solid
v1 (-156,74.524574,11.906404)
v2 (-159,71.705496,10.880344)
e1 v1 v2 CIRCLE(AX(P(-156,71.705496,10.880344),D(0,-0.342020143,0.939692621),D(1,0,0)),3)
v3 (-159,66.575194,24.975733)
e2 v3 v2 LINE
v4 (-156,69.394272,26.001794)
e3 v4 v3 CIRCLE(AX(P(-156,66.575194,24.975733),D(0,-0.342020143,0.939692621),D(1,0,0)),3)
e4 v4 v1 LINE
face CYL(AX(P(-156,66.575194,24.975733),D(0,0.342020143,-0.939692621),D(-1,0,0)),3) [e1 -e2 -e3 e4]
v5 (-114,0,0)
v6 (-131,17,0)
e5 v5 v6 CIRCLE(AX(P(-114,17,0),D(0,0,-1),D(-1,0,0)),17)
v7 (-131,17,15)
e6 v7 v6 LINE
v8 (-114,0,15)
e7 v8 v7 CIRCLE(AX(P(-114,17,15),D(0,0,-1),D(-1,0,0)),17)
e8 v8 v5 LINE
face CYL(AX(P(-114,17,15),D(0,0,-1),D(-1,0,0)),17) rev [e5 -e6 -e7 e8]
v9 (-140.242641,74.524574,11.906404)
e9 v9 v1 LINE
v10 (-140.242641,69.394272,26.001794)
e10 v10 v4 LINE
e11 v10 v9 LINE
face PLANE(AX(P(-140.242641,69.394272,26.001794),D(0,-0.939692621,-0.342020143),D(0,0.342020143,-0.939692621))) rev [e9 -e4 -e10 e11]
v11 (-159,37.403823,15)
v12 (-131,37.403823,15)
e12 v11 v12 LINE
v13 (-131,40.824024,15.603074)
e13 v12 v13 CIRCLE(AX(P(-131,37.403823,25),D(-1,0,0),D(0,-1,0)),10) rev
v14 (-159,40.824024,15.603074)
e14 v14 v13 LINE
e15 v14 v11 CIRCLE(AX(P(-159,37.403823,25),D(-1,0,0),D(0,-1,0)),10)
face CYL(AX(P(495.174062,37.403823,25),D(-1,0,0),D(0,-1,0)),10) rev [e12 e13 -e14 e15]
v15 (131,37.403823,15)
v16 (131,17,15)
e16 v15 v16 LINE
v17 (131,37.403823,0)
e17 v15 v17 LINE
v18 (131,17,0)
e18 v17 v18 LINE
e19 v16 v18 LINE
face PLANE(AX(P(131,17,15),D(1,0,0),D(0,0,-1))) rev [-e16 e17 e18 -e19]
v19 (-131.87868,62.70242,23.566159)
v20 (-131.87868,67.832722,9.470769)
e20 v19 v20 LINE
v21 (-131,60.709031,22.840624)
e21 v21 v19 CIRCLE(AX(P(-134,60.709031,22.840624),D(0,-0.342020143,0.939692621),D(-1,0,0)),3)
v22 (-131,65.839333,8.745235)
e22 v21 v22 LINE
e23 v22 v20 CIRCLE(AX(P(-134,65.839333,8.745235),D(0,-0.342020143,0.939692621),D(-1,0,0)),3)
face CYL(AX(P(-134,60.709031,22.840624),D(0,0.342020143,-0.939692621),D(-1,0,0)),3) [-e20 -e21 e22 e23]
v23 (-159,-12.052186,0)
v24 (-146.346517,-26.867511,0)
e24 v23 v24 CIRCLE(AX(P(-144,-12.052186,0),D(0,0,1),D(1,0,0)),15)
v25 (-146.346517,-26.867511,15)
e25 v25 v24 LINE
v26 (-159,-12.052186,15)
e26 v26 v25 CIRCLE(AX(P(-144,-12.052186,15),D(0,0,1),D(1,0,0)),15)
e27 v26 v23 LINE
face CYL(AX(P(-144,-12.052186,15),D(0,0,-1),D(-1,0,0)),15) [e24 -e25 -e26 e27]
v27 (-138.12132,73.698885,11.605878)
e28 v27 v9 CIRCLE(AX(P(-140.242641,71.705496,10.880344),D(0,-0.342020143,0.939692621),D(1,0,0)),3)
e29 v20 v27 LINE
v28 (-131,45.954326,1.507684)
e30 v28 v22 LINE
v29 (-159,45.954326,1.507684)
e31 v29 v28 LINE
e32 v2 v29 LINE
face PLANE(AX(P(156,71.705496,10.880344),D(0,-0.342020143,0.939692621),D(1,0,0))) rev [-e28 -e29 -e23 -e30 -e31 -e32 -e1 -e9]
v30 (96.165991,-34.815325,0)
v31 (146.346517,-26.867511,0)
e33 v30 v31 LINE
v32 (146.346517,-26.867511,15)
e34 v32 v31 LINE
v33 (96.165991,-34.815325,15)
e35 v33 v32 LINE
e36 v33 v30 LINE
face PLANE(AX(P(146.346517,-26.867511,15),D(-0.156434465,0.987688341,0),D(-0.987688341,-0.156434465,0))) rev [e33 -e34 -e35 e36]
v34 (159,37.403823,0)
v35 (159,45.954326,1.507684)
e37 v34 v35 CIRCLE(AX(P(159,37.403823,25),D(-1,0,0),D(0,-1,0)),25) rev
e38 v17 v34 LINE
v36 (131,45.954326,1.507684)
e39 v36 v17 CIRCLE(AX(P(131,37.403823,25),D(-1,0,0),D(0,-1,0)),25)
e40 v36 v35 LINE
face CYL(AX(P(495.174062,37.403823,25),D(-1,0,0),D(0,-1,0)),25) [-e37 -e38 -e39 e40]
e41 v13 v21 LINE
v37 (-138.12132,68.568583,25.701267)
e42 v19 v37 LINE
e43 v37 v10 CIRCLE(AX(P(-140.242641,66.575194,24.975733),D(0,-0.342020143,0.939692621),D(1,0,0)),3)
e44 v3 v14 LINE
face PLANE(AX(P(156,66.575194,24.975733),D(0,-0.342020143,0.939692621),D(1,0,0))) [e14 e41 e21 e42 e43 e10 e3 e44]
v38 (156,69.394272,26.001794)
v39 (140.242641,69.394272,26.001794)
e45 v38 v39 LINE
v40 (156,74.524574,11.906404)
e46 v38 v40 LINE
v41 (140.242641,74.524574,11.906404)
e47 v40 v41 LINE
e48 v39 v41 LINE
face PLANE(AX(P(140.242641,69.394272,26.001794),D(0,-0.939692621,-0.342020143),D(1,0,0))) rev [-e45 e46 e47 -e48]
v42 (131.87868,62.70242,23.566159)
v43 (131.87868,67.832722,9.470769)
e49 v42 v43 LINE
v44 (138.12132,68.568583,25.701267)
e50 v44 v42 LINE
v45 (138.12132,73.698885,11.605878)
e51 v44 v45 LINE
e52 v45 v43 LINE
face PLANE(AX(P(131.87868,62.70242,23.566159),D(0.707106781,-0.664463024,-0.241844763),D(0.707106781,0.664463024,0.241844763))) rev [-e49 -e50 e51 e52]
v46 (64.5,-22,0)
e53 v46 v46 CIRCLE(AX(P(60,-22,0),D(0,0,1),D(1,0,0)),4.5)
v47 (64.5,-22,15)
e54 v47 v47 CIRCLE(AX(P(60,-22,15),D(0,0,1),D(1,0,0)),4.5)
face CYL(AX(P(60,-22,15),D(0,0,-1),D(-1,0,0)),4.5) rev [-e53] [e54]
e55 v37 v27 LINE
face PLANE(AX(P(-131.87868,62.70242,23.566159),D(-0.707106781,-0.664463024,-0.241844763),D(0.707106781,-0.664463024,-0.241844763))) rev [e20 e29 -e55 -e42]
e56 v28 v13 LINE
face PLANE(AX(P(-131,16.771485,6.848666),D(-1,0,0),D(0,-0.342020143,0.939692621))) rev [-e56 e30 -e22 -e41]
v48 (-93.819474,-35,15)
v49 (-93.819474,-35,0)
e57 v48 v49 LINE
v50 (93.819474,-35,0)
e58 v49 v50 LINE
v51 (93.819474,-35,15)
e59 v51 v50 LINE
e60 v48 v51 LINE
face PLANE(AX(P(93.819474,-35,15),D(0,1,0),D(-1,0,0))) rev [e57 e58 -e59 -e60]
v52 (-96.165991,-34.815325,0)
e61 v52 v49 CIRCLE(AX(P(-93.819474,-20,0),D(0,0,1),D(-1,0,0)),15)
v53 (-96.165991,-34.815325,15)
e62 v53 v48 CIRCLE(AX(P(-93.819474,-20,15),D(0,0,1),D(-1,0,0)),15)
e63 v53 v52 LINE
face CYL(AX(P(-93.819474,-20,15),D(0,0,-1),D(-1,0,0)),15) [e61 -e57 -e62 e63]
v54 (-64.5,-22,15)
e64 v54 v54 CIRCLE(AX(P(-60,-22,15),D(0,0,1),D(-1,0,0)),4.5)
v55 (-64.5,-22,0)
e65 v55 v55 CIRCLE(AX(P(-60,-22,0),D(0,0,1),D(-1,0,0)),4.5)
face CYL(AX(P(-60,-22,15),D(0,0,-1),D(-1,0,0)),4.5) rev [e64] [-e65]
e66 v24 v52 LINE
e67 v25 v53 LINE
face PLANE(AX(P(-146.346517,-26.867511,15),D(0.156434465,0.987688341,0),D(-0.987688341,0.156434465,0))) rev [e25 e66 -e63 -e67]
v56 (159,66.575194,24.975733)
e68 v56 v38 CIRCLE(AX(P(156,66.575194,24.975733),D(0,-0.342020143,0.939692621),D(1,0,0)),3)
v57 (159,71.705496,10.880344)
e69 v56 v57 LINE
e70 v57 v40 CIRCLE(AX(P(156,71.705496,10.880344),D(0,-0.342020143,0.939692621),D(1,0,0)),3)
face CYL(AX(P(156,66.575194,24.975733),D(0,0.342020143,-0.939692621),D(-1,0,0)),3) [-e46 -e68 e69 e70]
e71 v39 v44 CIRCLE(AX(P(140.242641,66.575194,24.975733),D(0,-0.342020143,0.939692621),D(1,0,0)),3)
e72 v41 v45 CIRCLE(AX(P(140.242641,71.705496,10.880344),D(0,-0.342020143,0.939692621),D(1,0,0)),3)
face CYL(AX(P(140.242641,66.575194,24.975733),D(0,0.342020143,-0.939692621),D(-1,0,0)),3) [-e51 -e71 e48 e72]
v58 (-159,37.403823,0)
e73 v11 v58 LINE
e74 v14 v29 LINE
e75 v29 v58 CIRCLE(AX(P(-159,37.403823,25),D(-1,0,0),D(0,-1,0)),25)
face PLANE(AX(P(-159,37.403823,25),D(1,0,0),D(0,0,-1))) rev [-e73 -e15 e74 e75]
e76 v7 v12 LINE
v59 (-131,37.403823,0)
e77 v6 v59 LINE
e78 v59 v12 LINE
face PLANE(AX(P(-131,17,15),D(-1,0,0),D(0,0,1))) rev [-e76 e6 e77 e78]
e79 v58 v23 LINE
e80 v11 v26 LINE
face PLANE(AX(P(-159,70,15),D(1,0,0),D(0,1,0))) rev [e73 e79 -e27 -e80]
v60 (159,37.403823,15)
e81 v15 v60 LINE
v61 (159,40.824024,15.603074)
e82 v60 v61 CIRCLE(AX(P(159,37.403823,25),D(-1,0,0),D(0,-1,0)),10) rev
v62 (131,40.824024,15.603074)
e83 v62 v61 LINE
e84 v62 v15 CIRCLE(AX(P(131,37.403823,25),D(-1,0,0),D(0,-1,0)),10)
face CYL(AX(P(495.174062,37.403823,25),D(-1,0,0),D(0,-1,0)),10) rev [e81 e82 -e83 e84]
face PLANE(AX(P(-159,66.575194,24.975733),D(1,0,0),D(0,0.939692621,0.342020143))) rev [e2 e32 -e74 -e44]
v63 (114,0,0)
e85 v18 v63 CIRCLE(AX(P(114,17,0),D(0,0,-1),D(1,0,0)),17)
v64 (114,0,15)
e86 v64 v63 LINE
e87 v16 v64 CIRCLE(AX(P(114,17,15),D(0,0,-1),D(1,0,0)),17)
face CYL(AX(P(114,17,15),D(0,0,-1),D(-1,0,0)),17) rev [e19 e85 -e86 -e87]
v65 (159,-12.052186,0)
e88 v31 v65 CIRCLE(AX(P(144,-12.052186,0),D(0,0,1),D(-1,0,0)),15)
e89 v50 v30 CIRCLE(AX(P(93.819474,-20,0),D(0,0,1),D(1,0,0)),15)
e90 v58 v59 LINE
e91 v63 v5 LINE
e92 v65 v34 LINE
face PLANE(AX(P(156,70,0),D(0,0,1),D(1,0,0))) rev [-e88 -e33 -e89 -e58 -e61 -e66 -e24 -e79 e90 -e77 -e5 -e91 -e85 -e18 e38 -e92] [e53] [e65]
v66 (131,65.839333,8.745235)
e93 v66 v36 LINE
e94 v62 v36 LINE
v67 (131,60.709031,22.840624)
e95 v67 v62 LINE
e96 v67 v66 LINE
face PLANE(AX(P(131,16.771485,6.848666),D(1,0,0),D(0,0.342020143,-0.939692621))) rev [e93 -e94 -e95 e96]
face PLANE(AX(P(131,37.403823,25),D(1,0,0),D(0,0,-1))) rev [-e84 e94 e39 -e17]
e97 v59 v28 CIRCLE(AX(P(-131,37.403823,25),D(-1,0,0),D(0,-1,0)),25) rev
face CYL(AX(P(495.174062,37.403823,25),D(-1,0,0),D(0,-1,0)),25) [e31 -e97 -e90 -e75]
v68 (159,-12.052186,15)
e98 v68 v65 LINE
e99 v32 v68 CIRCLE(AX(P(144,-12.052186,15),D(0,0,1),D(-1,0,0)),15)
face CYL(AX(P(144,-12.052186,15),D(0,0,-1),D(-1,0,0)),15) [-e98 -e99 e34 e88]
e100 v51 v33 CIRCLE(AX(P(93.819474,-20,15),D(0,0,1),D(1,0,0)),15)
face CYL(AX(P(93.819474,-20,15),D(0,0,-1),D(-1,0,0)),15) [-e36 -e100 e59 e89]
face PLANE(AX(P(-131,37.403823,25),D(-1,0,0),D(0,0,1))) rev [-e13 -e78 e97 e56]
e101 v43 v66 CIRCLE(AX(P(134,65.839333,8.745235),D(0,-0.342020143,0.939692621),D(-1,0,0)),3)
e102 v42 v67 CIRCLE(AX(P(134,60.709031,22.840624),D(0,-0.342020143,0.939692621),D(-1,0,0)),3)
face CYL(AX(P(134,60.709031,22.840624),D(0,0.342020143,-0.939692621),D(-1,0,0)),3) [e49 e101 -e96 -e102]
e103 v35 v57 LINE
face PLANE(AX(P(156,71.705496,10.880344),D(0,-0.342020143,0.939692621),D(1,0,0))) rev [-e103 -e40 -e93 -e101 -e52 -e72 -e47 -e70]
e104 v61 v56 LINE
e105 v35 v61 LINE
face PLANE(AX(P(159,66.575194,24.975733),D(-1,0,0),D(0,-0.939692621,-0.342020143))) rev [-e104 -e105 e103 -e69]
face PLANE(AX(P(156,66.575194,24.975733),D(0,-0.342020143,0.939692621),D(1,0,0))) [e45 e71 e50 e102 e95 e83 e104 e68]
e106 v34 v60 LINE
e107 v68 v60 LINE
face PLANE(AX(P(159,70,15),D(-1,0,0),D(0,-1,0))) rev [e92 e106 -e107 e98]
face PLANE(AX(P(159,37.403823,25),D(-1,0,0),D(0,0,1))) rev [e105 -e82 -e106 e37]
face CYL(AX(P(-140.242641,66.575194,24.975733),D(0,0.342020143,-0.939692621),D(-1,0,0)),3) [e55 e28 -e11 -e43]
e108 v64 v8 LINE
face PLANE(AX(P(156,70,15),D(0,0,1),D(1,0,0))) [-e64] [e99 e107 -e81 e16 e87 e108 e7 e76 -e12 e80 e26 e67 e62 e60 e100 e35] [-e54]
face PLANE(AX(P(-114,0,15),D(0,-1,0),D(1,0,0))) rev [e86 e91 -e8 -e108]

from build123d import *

# Parameters (mm, degrees)
SKETCH1_R              = 4.5
EXTRUDE1_DEPTH         = 15
PROCESS_BENDS1_START   = -159
PROCESS_BENDS1_DEPTH   = 318
PROCESS_BENDS1_2_DEPTH = 28
PROCESS_BENDS1_START_2 = 131
PROCESS_BENDS1_3_DEPTH = 28
PROCESS_BENDS1_START_3 = -0.699454706
PROCESS_BENDS1_4_DEPTH = 14.999999999
PROCESS_BENDS1_START_4 = 7.710911858
PROCESS_BENDS1_5_DEPTH = 6.589633435


with BuildPart() as part:
    # Sketch1 → Extrude1 (new body)
    with BuildSketch(Plane.XY):
        with BuildLine():
            Line((-114, 0), (114, 0))
            ThreePointArc((114, 0), (126.02081528, 4.97918472), (131, 17))
            Line((131, 17), (131, 63.757359313))
            ThreePointArc((131, 63.757359313), (131.228361402, 64.90540961), (131.878679656, 65.878679656))
            Line((131.878679656, 65.878679656), (138.121320344, 72.121320344))
            ThreePointArc((138.121320344, 72.121320344), (139.09459039, 72.771638598), (140.242640687, 73))
            Line((140.242640687, 73), (156, 73))
            ThreePointArc((156, 73), (158.121320344, 72.121320344), (159, 70))
            Line((159, 70), (159, -12.052185537))
            ThreePointArc((159, -12.052185537), (155.406089484, -21.793906262), (146.346516976, -26.867510646))
            Line((146.346516976, -26.867510646), (96.165991373, -34.815325109))
            ThreePointArc((96.165991373, -34.815325109), (94.996360834, -34.953760006), (93.819474398, -35))
            Line((93.819474398, -35), (-93.819474398, -35))
            ThreePointArc((-93.819474398, -35), (-94.996360834, -34.953760006), (-96.165991373, -34.815325109))
            Line((-96.165991373, -34.815325109), (-146.346516976, -26.867510646))
            ThreePointArc((-146.346516976, -26.867510646), (-155.406089484, -21.793906262), (-159, -12.052185537))
            Line((-159, -12.052185537), (-159, 70))
            ThreePointArc((-159, 70), (-158.121320344, 72.121320344), (-156, 73))
            Line((-156, 73), (-140.242640687, 73))
            ThreePointArc((-140.242640687, 73), (-139.09459039, 72.771638598), (-138.121320344, 72.121320344))
            Line((-138.121320344, 72.121320344), (-131.878679656, 65.878679656))
            ThreePointArc((-131.878679656, 65.878679656), (-131.228361402, 64.90540961), (-131, 63.757359313))
            Line((-131, 63.757359313), (-131, 17))
            ThreePointArc((-131, 17), (-126.02081528, 4.97918472), (-114, 0))
        make_face()
        with Locations((60, -22)):
            Circle(SKETCH1_R, mode=Mode.SUBTRACT)
        with Locations(Location((-60, -22, 0), (0, 0, 180))):
            Circle(SKETCH1_R, mode=Mode.SUBTRACT)
    extrude(amount=EXTRUDE1_DEPTH)

    # Process-Bends1: read off the stored shape, not the designer's step
    # Process-Bends1 outline → Process-Bends1 (cut)
    with BuildSketch(Plane.YZ.offset(PROCESS_BENDS1_START)):
        with BuildLine():
            Line((73, 0), (73, 11.351504666))
            Line((73, 11.351504666), (45.954326321, 1.50768448))
            ThreePointArc((45.954326321, 1.50768448), (41.745027179, 0.379806175), (37.403822738, 0))
            Line((37.403822738, 0), (73, 0))
        make_face()
    extrude(amount=PROCESS_BENDS1_DEPTH, mode=Mode.SUBTRACT)

    # Process-Bends1 2 outline → Process-Bends1 2 (add)
    with BuildSketch(Plane.YZ.offset(PROCESS_BENDS1_START)):
        with BuildLine():
            Line((74.524574191, 11.906404291), (69.394272041, 26.001793603))
            Line((69.394272041, 26.001793603), (40.824024171, 15.603073792))
            ThreePointArc((40.824024171, 15.603073792), (39.140304514, 15.15192247), (37.403822738, 15))
            Line((37.403822738, 15), (73, 15))
            Line((73, 15), (73, 11.351504666))
            Line((73, 11.351504666), (74.524574191, 11.906404291))
        make_face()
    extrude(amount=PROCESS_BENDS1_2_DEPTH)

    # Process-Bends1 3 outline → Process-Bends1 3 (add)
    with BuildSketch(Plane.YZ.offset(PROCESS_BENDS1_START_2)):
        with BuildLine():
            Line((74.524574191, 11.906404291), (69.394272041, 26.001793603))
            Line((69.394272041, 26.001793603), (40.824024171, 15.603073792))
            ThreePointArc((40.824024171, 15.603073792), (39.140304514, 15.15192247), (37.403822738, 15))
            Line((37.403822738, 15), (73, 15))
            Line((73, 15), (73, 11.351504666))
            Line((73, 11.351504666), (74.524574191, 11.906404291))
        make_face()
    extrude(amount=PROCESS_BENDS1_3_DEPTH)

    # Process-Bends1 4 outline → Process-Bends1 4 (cut)
    with BuildSketch(Plane(origin=(0, 0, 0), x_dir=(1, 0, 0), z_dir=(0, 0.34202014332567, -0.939692620785908)).offset(PROCESS_BENDS1_START_3)):
        with BuildLine():
            ThreePointArc((140.242640687, -74.102422537), (139.09459039, -73.874061134), (138.121320344, -73.22374288))
            Line((138.121320344, -73.22374288), (131.878679656, -66.981102193))
            ThreePointArc((131.878679656, -66.981102193), (131.228361402, -66.007832146), (131, -64.859781849))
            Line((131, -64.859781849), (131, -74.102422537))
            Line((131, -74.102422537), (140.242640687, -74.102422537))
        make_face()
        with BuildLine():
            ThreePointArc((159, -71.102422537), (158.121320344, -73.22374288), (156, -74.102422537))
            Line((156, -74.102422537), (159, -74.102422537))
            Line((159, -74.102422537), (160, -74.102422548))
            Line((160, -74.102422548), (160, -61))
            Line((160, -61), (159.000000001, -61))
            Line((159.000000001, -61), (159, -71.102422537))
        make_face()
        with BuildLine():
            Line((-140.242640687, -74.102422537), (-131, -74.102422537))
            Line((-131, -74.102422537), (-131, -64.859781849))
            ThreePointArc((-131, -64.859781849), (-131.228361402, -66.007832146), (-131.878679656, -66.981102193))
            Line((-131.878679656, -66.981102193), (-138.121320344, -73.22374288))
            ThreePointArc((-138.121320344, -73.22374288), (-139.09459039, -73.874061134), (-140.242640687, -74.102422537))
        make_face()
        with BuildLine():
            Line((-159, -74.102422537), (-156, -74.102422537))
            ThreePointArc((-156, -74.102422537), (-158.121320344, -73.22374288), (-159, -71.102422537))
            Line((-159, -71.102422537), (-159.000000001, -61))
            Line((-159.000000001, -61), (-160, -61))
            Line((-160, -61), (-160, -74.102422548))
            Line((-160, -74.102422548), (-159, -74.102422537))
        make_face()
    extrude(amount=PROCESS_BENDS1_4_DEPTH, mode=Mode.SUBTRACT)

    # Process-Bends1 5 outline → Process-Bends1 5 (add)
    with BuildSketch(Plane(origin=(0, 0, 0), x_dir=(1, 0, 0), z_dir=(0, 0.34202014332567, -0.939692620785908)).offset(PROCESS_BENDS1_START_4)):
        with BuildLine():
            Line((131.878679656, -66.981102193), (138.121320344, -73.22374288))
            ThreePointArc((138.121320344, -73.22374288), (139.09459039, -73.874061134), (140.242640687, -74.102422537))
            Line((140.242640687, -74.102422537), (156, -74.102422537))
            ThreePointArc((156, -74.102422537), (158.121320344, -73.22374288), (159, -71.102422537))
            Line((159, -71.102422537), (159.000000001, -61))
            Line((159.000000001, -61), (131.000000004, -61))
            Line((131.000000004, -61), (131, -64.859781849))
            ThreePointArc((131, -64.859781849), (131.228361402, -66.007832146), (131.878679656, -66.981102193))
        make_face()
        with BuildLine():
            ThreePointArc((-131.878679656, -66.981102193), (-131.228361402, -66.007832146), (-131, -64.859781849))
            Line((-131, -64.859781849), (-131, -61))
            Line((-131, -61), (-159.000000001, -61))
            Line((-159.000000001, -61), (-159, -71.102422537))
            ThreePointArc((-159, -71.102422537), (-158.121320344, -73.22374288), (-156, -74.102422537))
            Line((-156, -74.102422537), (-140.242640687, -74.102422537))
            ThreePointArc((-140.242640687, -74.102422537), (-139.09459039, -73.874061134), (-138.121320344, -73.22374288))
            Line((-138.121320344, -73.22374288), (-131.878679656, -66.981102193))
        make_face()
    extrude(amount=PROCESS_BENDS1_5_DEPTH)


solid = part.part
